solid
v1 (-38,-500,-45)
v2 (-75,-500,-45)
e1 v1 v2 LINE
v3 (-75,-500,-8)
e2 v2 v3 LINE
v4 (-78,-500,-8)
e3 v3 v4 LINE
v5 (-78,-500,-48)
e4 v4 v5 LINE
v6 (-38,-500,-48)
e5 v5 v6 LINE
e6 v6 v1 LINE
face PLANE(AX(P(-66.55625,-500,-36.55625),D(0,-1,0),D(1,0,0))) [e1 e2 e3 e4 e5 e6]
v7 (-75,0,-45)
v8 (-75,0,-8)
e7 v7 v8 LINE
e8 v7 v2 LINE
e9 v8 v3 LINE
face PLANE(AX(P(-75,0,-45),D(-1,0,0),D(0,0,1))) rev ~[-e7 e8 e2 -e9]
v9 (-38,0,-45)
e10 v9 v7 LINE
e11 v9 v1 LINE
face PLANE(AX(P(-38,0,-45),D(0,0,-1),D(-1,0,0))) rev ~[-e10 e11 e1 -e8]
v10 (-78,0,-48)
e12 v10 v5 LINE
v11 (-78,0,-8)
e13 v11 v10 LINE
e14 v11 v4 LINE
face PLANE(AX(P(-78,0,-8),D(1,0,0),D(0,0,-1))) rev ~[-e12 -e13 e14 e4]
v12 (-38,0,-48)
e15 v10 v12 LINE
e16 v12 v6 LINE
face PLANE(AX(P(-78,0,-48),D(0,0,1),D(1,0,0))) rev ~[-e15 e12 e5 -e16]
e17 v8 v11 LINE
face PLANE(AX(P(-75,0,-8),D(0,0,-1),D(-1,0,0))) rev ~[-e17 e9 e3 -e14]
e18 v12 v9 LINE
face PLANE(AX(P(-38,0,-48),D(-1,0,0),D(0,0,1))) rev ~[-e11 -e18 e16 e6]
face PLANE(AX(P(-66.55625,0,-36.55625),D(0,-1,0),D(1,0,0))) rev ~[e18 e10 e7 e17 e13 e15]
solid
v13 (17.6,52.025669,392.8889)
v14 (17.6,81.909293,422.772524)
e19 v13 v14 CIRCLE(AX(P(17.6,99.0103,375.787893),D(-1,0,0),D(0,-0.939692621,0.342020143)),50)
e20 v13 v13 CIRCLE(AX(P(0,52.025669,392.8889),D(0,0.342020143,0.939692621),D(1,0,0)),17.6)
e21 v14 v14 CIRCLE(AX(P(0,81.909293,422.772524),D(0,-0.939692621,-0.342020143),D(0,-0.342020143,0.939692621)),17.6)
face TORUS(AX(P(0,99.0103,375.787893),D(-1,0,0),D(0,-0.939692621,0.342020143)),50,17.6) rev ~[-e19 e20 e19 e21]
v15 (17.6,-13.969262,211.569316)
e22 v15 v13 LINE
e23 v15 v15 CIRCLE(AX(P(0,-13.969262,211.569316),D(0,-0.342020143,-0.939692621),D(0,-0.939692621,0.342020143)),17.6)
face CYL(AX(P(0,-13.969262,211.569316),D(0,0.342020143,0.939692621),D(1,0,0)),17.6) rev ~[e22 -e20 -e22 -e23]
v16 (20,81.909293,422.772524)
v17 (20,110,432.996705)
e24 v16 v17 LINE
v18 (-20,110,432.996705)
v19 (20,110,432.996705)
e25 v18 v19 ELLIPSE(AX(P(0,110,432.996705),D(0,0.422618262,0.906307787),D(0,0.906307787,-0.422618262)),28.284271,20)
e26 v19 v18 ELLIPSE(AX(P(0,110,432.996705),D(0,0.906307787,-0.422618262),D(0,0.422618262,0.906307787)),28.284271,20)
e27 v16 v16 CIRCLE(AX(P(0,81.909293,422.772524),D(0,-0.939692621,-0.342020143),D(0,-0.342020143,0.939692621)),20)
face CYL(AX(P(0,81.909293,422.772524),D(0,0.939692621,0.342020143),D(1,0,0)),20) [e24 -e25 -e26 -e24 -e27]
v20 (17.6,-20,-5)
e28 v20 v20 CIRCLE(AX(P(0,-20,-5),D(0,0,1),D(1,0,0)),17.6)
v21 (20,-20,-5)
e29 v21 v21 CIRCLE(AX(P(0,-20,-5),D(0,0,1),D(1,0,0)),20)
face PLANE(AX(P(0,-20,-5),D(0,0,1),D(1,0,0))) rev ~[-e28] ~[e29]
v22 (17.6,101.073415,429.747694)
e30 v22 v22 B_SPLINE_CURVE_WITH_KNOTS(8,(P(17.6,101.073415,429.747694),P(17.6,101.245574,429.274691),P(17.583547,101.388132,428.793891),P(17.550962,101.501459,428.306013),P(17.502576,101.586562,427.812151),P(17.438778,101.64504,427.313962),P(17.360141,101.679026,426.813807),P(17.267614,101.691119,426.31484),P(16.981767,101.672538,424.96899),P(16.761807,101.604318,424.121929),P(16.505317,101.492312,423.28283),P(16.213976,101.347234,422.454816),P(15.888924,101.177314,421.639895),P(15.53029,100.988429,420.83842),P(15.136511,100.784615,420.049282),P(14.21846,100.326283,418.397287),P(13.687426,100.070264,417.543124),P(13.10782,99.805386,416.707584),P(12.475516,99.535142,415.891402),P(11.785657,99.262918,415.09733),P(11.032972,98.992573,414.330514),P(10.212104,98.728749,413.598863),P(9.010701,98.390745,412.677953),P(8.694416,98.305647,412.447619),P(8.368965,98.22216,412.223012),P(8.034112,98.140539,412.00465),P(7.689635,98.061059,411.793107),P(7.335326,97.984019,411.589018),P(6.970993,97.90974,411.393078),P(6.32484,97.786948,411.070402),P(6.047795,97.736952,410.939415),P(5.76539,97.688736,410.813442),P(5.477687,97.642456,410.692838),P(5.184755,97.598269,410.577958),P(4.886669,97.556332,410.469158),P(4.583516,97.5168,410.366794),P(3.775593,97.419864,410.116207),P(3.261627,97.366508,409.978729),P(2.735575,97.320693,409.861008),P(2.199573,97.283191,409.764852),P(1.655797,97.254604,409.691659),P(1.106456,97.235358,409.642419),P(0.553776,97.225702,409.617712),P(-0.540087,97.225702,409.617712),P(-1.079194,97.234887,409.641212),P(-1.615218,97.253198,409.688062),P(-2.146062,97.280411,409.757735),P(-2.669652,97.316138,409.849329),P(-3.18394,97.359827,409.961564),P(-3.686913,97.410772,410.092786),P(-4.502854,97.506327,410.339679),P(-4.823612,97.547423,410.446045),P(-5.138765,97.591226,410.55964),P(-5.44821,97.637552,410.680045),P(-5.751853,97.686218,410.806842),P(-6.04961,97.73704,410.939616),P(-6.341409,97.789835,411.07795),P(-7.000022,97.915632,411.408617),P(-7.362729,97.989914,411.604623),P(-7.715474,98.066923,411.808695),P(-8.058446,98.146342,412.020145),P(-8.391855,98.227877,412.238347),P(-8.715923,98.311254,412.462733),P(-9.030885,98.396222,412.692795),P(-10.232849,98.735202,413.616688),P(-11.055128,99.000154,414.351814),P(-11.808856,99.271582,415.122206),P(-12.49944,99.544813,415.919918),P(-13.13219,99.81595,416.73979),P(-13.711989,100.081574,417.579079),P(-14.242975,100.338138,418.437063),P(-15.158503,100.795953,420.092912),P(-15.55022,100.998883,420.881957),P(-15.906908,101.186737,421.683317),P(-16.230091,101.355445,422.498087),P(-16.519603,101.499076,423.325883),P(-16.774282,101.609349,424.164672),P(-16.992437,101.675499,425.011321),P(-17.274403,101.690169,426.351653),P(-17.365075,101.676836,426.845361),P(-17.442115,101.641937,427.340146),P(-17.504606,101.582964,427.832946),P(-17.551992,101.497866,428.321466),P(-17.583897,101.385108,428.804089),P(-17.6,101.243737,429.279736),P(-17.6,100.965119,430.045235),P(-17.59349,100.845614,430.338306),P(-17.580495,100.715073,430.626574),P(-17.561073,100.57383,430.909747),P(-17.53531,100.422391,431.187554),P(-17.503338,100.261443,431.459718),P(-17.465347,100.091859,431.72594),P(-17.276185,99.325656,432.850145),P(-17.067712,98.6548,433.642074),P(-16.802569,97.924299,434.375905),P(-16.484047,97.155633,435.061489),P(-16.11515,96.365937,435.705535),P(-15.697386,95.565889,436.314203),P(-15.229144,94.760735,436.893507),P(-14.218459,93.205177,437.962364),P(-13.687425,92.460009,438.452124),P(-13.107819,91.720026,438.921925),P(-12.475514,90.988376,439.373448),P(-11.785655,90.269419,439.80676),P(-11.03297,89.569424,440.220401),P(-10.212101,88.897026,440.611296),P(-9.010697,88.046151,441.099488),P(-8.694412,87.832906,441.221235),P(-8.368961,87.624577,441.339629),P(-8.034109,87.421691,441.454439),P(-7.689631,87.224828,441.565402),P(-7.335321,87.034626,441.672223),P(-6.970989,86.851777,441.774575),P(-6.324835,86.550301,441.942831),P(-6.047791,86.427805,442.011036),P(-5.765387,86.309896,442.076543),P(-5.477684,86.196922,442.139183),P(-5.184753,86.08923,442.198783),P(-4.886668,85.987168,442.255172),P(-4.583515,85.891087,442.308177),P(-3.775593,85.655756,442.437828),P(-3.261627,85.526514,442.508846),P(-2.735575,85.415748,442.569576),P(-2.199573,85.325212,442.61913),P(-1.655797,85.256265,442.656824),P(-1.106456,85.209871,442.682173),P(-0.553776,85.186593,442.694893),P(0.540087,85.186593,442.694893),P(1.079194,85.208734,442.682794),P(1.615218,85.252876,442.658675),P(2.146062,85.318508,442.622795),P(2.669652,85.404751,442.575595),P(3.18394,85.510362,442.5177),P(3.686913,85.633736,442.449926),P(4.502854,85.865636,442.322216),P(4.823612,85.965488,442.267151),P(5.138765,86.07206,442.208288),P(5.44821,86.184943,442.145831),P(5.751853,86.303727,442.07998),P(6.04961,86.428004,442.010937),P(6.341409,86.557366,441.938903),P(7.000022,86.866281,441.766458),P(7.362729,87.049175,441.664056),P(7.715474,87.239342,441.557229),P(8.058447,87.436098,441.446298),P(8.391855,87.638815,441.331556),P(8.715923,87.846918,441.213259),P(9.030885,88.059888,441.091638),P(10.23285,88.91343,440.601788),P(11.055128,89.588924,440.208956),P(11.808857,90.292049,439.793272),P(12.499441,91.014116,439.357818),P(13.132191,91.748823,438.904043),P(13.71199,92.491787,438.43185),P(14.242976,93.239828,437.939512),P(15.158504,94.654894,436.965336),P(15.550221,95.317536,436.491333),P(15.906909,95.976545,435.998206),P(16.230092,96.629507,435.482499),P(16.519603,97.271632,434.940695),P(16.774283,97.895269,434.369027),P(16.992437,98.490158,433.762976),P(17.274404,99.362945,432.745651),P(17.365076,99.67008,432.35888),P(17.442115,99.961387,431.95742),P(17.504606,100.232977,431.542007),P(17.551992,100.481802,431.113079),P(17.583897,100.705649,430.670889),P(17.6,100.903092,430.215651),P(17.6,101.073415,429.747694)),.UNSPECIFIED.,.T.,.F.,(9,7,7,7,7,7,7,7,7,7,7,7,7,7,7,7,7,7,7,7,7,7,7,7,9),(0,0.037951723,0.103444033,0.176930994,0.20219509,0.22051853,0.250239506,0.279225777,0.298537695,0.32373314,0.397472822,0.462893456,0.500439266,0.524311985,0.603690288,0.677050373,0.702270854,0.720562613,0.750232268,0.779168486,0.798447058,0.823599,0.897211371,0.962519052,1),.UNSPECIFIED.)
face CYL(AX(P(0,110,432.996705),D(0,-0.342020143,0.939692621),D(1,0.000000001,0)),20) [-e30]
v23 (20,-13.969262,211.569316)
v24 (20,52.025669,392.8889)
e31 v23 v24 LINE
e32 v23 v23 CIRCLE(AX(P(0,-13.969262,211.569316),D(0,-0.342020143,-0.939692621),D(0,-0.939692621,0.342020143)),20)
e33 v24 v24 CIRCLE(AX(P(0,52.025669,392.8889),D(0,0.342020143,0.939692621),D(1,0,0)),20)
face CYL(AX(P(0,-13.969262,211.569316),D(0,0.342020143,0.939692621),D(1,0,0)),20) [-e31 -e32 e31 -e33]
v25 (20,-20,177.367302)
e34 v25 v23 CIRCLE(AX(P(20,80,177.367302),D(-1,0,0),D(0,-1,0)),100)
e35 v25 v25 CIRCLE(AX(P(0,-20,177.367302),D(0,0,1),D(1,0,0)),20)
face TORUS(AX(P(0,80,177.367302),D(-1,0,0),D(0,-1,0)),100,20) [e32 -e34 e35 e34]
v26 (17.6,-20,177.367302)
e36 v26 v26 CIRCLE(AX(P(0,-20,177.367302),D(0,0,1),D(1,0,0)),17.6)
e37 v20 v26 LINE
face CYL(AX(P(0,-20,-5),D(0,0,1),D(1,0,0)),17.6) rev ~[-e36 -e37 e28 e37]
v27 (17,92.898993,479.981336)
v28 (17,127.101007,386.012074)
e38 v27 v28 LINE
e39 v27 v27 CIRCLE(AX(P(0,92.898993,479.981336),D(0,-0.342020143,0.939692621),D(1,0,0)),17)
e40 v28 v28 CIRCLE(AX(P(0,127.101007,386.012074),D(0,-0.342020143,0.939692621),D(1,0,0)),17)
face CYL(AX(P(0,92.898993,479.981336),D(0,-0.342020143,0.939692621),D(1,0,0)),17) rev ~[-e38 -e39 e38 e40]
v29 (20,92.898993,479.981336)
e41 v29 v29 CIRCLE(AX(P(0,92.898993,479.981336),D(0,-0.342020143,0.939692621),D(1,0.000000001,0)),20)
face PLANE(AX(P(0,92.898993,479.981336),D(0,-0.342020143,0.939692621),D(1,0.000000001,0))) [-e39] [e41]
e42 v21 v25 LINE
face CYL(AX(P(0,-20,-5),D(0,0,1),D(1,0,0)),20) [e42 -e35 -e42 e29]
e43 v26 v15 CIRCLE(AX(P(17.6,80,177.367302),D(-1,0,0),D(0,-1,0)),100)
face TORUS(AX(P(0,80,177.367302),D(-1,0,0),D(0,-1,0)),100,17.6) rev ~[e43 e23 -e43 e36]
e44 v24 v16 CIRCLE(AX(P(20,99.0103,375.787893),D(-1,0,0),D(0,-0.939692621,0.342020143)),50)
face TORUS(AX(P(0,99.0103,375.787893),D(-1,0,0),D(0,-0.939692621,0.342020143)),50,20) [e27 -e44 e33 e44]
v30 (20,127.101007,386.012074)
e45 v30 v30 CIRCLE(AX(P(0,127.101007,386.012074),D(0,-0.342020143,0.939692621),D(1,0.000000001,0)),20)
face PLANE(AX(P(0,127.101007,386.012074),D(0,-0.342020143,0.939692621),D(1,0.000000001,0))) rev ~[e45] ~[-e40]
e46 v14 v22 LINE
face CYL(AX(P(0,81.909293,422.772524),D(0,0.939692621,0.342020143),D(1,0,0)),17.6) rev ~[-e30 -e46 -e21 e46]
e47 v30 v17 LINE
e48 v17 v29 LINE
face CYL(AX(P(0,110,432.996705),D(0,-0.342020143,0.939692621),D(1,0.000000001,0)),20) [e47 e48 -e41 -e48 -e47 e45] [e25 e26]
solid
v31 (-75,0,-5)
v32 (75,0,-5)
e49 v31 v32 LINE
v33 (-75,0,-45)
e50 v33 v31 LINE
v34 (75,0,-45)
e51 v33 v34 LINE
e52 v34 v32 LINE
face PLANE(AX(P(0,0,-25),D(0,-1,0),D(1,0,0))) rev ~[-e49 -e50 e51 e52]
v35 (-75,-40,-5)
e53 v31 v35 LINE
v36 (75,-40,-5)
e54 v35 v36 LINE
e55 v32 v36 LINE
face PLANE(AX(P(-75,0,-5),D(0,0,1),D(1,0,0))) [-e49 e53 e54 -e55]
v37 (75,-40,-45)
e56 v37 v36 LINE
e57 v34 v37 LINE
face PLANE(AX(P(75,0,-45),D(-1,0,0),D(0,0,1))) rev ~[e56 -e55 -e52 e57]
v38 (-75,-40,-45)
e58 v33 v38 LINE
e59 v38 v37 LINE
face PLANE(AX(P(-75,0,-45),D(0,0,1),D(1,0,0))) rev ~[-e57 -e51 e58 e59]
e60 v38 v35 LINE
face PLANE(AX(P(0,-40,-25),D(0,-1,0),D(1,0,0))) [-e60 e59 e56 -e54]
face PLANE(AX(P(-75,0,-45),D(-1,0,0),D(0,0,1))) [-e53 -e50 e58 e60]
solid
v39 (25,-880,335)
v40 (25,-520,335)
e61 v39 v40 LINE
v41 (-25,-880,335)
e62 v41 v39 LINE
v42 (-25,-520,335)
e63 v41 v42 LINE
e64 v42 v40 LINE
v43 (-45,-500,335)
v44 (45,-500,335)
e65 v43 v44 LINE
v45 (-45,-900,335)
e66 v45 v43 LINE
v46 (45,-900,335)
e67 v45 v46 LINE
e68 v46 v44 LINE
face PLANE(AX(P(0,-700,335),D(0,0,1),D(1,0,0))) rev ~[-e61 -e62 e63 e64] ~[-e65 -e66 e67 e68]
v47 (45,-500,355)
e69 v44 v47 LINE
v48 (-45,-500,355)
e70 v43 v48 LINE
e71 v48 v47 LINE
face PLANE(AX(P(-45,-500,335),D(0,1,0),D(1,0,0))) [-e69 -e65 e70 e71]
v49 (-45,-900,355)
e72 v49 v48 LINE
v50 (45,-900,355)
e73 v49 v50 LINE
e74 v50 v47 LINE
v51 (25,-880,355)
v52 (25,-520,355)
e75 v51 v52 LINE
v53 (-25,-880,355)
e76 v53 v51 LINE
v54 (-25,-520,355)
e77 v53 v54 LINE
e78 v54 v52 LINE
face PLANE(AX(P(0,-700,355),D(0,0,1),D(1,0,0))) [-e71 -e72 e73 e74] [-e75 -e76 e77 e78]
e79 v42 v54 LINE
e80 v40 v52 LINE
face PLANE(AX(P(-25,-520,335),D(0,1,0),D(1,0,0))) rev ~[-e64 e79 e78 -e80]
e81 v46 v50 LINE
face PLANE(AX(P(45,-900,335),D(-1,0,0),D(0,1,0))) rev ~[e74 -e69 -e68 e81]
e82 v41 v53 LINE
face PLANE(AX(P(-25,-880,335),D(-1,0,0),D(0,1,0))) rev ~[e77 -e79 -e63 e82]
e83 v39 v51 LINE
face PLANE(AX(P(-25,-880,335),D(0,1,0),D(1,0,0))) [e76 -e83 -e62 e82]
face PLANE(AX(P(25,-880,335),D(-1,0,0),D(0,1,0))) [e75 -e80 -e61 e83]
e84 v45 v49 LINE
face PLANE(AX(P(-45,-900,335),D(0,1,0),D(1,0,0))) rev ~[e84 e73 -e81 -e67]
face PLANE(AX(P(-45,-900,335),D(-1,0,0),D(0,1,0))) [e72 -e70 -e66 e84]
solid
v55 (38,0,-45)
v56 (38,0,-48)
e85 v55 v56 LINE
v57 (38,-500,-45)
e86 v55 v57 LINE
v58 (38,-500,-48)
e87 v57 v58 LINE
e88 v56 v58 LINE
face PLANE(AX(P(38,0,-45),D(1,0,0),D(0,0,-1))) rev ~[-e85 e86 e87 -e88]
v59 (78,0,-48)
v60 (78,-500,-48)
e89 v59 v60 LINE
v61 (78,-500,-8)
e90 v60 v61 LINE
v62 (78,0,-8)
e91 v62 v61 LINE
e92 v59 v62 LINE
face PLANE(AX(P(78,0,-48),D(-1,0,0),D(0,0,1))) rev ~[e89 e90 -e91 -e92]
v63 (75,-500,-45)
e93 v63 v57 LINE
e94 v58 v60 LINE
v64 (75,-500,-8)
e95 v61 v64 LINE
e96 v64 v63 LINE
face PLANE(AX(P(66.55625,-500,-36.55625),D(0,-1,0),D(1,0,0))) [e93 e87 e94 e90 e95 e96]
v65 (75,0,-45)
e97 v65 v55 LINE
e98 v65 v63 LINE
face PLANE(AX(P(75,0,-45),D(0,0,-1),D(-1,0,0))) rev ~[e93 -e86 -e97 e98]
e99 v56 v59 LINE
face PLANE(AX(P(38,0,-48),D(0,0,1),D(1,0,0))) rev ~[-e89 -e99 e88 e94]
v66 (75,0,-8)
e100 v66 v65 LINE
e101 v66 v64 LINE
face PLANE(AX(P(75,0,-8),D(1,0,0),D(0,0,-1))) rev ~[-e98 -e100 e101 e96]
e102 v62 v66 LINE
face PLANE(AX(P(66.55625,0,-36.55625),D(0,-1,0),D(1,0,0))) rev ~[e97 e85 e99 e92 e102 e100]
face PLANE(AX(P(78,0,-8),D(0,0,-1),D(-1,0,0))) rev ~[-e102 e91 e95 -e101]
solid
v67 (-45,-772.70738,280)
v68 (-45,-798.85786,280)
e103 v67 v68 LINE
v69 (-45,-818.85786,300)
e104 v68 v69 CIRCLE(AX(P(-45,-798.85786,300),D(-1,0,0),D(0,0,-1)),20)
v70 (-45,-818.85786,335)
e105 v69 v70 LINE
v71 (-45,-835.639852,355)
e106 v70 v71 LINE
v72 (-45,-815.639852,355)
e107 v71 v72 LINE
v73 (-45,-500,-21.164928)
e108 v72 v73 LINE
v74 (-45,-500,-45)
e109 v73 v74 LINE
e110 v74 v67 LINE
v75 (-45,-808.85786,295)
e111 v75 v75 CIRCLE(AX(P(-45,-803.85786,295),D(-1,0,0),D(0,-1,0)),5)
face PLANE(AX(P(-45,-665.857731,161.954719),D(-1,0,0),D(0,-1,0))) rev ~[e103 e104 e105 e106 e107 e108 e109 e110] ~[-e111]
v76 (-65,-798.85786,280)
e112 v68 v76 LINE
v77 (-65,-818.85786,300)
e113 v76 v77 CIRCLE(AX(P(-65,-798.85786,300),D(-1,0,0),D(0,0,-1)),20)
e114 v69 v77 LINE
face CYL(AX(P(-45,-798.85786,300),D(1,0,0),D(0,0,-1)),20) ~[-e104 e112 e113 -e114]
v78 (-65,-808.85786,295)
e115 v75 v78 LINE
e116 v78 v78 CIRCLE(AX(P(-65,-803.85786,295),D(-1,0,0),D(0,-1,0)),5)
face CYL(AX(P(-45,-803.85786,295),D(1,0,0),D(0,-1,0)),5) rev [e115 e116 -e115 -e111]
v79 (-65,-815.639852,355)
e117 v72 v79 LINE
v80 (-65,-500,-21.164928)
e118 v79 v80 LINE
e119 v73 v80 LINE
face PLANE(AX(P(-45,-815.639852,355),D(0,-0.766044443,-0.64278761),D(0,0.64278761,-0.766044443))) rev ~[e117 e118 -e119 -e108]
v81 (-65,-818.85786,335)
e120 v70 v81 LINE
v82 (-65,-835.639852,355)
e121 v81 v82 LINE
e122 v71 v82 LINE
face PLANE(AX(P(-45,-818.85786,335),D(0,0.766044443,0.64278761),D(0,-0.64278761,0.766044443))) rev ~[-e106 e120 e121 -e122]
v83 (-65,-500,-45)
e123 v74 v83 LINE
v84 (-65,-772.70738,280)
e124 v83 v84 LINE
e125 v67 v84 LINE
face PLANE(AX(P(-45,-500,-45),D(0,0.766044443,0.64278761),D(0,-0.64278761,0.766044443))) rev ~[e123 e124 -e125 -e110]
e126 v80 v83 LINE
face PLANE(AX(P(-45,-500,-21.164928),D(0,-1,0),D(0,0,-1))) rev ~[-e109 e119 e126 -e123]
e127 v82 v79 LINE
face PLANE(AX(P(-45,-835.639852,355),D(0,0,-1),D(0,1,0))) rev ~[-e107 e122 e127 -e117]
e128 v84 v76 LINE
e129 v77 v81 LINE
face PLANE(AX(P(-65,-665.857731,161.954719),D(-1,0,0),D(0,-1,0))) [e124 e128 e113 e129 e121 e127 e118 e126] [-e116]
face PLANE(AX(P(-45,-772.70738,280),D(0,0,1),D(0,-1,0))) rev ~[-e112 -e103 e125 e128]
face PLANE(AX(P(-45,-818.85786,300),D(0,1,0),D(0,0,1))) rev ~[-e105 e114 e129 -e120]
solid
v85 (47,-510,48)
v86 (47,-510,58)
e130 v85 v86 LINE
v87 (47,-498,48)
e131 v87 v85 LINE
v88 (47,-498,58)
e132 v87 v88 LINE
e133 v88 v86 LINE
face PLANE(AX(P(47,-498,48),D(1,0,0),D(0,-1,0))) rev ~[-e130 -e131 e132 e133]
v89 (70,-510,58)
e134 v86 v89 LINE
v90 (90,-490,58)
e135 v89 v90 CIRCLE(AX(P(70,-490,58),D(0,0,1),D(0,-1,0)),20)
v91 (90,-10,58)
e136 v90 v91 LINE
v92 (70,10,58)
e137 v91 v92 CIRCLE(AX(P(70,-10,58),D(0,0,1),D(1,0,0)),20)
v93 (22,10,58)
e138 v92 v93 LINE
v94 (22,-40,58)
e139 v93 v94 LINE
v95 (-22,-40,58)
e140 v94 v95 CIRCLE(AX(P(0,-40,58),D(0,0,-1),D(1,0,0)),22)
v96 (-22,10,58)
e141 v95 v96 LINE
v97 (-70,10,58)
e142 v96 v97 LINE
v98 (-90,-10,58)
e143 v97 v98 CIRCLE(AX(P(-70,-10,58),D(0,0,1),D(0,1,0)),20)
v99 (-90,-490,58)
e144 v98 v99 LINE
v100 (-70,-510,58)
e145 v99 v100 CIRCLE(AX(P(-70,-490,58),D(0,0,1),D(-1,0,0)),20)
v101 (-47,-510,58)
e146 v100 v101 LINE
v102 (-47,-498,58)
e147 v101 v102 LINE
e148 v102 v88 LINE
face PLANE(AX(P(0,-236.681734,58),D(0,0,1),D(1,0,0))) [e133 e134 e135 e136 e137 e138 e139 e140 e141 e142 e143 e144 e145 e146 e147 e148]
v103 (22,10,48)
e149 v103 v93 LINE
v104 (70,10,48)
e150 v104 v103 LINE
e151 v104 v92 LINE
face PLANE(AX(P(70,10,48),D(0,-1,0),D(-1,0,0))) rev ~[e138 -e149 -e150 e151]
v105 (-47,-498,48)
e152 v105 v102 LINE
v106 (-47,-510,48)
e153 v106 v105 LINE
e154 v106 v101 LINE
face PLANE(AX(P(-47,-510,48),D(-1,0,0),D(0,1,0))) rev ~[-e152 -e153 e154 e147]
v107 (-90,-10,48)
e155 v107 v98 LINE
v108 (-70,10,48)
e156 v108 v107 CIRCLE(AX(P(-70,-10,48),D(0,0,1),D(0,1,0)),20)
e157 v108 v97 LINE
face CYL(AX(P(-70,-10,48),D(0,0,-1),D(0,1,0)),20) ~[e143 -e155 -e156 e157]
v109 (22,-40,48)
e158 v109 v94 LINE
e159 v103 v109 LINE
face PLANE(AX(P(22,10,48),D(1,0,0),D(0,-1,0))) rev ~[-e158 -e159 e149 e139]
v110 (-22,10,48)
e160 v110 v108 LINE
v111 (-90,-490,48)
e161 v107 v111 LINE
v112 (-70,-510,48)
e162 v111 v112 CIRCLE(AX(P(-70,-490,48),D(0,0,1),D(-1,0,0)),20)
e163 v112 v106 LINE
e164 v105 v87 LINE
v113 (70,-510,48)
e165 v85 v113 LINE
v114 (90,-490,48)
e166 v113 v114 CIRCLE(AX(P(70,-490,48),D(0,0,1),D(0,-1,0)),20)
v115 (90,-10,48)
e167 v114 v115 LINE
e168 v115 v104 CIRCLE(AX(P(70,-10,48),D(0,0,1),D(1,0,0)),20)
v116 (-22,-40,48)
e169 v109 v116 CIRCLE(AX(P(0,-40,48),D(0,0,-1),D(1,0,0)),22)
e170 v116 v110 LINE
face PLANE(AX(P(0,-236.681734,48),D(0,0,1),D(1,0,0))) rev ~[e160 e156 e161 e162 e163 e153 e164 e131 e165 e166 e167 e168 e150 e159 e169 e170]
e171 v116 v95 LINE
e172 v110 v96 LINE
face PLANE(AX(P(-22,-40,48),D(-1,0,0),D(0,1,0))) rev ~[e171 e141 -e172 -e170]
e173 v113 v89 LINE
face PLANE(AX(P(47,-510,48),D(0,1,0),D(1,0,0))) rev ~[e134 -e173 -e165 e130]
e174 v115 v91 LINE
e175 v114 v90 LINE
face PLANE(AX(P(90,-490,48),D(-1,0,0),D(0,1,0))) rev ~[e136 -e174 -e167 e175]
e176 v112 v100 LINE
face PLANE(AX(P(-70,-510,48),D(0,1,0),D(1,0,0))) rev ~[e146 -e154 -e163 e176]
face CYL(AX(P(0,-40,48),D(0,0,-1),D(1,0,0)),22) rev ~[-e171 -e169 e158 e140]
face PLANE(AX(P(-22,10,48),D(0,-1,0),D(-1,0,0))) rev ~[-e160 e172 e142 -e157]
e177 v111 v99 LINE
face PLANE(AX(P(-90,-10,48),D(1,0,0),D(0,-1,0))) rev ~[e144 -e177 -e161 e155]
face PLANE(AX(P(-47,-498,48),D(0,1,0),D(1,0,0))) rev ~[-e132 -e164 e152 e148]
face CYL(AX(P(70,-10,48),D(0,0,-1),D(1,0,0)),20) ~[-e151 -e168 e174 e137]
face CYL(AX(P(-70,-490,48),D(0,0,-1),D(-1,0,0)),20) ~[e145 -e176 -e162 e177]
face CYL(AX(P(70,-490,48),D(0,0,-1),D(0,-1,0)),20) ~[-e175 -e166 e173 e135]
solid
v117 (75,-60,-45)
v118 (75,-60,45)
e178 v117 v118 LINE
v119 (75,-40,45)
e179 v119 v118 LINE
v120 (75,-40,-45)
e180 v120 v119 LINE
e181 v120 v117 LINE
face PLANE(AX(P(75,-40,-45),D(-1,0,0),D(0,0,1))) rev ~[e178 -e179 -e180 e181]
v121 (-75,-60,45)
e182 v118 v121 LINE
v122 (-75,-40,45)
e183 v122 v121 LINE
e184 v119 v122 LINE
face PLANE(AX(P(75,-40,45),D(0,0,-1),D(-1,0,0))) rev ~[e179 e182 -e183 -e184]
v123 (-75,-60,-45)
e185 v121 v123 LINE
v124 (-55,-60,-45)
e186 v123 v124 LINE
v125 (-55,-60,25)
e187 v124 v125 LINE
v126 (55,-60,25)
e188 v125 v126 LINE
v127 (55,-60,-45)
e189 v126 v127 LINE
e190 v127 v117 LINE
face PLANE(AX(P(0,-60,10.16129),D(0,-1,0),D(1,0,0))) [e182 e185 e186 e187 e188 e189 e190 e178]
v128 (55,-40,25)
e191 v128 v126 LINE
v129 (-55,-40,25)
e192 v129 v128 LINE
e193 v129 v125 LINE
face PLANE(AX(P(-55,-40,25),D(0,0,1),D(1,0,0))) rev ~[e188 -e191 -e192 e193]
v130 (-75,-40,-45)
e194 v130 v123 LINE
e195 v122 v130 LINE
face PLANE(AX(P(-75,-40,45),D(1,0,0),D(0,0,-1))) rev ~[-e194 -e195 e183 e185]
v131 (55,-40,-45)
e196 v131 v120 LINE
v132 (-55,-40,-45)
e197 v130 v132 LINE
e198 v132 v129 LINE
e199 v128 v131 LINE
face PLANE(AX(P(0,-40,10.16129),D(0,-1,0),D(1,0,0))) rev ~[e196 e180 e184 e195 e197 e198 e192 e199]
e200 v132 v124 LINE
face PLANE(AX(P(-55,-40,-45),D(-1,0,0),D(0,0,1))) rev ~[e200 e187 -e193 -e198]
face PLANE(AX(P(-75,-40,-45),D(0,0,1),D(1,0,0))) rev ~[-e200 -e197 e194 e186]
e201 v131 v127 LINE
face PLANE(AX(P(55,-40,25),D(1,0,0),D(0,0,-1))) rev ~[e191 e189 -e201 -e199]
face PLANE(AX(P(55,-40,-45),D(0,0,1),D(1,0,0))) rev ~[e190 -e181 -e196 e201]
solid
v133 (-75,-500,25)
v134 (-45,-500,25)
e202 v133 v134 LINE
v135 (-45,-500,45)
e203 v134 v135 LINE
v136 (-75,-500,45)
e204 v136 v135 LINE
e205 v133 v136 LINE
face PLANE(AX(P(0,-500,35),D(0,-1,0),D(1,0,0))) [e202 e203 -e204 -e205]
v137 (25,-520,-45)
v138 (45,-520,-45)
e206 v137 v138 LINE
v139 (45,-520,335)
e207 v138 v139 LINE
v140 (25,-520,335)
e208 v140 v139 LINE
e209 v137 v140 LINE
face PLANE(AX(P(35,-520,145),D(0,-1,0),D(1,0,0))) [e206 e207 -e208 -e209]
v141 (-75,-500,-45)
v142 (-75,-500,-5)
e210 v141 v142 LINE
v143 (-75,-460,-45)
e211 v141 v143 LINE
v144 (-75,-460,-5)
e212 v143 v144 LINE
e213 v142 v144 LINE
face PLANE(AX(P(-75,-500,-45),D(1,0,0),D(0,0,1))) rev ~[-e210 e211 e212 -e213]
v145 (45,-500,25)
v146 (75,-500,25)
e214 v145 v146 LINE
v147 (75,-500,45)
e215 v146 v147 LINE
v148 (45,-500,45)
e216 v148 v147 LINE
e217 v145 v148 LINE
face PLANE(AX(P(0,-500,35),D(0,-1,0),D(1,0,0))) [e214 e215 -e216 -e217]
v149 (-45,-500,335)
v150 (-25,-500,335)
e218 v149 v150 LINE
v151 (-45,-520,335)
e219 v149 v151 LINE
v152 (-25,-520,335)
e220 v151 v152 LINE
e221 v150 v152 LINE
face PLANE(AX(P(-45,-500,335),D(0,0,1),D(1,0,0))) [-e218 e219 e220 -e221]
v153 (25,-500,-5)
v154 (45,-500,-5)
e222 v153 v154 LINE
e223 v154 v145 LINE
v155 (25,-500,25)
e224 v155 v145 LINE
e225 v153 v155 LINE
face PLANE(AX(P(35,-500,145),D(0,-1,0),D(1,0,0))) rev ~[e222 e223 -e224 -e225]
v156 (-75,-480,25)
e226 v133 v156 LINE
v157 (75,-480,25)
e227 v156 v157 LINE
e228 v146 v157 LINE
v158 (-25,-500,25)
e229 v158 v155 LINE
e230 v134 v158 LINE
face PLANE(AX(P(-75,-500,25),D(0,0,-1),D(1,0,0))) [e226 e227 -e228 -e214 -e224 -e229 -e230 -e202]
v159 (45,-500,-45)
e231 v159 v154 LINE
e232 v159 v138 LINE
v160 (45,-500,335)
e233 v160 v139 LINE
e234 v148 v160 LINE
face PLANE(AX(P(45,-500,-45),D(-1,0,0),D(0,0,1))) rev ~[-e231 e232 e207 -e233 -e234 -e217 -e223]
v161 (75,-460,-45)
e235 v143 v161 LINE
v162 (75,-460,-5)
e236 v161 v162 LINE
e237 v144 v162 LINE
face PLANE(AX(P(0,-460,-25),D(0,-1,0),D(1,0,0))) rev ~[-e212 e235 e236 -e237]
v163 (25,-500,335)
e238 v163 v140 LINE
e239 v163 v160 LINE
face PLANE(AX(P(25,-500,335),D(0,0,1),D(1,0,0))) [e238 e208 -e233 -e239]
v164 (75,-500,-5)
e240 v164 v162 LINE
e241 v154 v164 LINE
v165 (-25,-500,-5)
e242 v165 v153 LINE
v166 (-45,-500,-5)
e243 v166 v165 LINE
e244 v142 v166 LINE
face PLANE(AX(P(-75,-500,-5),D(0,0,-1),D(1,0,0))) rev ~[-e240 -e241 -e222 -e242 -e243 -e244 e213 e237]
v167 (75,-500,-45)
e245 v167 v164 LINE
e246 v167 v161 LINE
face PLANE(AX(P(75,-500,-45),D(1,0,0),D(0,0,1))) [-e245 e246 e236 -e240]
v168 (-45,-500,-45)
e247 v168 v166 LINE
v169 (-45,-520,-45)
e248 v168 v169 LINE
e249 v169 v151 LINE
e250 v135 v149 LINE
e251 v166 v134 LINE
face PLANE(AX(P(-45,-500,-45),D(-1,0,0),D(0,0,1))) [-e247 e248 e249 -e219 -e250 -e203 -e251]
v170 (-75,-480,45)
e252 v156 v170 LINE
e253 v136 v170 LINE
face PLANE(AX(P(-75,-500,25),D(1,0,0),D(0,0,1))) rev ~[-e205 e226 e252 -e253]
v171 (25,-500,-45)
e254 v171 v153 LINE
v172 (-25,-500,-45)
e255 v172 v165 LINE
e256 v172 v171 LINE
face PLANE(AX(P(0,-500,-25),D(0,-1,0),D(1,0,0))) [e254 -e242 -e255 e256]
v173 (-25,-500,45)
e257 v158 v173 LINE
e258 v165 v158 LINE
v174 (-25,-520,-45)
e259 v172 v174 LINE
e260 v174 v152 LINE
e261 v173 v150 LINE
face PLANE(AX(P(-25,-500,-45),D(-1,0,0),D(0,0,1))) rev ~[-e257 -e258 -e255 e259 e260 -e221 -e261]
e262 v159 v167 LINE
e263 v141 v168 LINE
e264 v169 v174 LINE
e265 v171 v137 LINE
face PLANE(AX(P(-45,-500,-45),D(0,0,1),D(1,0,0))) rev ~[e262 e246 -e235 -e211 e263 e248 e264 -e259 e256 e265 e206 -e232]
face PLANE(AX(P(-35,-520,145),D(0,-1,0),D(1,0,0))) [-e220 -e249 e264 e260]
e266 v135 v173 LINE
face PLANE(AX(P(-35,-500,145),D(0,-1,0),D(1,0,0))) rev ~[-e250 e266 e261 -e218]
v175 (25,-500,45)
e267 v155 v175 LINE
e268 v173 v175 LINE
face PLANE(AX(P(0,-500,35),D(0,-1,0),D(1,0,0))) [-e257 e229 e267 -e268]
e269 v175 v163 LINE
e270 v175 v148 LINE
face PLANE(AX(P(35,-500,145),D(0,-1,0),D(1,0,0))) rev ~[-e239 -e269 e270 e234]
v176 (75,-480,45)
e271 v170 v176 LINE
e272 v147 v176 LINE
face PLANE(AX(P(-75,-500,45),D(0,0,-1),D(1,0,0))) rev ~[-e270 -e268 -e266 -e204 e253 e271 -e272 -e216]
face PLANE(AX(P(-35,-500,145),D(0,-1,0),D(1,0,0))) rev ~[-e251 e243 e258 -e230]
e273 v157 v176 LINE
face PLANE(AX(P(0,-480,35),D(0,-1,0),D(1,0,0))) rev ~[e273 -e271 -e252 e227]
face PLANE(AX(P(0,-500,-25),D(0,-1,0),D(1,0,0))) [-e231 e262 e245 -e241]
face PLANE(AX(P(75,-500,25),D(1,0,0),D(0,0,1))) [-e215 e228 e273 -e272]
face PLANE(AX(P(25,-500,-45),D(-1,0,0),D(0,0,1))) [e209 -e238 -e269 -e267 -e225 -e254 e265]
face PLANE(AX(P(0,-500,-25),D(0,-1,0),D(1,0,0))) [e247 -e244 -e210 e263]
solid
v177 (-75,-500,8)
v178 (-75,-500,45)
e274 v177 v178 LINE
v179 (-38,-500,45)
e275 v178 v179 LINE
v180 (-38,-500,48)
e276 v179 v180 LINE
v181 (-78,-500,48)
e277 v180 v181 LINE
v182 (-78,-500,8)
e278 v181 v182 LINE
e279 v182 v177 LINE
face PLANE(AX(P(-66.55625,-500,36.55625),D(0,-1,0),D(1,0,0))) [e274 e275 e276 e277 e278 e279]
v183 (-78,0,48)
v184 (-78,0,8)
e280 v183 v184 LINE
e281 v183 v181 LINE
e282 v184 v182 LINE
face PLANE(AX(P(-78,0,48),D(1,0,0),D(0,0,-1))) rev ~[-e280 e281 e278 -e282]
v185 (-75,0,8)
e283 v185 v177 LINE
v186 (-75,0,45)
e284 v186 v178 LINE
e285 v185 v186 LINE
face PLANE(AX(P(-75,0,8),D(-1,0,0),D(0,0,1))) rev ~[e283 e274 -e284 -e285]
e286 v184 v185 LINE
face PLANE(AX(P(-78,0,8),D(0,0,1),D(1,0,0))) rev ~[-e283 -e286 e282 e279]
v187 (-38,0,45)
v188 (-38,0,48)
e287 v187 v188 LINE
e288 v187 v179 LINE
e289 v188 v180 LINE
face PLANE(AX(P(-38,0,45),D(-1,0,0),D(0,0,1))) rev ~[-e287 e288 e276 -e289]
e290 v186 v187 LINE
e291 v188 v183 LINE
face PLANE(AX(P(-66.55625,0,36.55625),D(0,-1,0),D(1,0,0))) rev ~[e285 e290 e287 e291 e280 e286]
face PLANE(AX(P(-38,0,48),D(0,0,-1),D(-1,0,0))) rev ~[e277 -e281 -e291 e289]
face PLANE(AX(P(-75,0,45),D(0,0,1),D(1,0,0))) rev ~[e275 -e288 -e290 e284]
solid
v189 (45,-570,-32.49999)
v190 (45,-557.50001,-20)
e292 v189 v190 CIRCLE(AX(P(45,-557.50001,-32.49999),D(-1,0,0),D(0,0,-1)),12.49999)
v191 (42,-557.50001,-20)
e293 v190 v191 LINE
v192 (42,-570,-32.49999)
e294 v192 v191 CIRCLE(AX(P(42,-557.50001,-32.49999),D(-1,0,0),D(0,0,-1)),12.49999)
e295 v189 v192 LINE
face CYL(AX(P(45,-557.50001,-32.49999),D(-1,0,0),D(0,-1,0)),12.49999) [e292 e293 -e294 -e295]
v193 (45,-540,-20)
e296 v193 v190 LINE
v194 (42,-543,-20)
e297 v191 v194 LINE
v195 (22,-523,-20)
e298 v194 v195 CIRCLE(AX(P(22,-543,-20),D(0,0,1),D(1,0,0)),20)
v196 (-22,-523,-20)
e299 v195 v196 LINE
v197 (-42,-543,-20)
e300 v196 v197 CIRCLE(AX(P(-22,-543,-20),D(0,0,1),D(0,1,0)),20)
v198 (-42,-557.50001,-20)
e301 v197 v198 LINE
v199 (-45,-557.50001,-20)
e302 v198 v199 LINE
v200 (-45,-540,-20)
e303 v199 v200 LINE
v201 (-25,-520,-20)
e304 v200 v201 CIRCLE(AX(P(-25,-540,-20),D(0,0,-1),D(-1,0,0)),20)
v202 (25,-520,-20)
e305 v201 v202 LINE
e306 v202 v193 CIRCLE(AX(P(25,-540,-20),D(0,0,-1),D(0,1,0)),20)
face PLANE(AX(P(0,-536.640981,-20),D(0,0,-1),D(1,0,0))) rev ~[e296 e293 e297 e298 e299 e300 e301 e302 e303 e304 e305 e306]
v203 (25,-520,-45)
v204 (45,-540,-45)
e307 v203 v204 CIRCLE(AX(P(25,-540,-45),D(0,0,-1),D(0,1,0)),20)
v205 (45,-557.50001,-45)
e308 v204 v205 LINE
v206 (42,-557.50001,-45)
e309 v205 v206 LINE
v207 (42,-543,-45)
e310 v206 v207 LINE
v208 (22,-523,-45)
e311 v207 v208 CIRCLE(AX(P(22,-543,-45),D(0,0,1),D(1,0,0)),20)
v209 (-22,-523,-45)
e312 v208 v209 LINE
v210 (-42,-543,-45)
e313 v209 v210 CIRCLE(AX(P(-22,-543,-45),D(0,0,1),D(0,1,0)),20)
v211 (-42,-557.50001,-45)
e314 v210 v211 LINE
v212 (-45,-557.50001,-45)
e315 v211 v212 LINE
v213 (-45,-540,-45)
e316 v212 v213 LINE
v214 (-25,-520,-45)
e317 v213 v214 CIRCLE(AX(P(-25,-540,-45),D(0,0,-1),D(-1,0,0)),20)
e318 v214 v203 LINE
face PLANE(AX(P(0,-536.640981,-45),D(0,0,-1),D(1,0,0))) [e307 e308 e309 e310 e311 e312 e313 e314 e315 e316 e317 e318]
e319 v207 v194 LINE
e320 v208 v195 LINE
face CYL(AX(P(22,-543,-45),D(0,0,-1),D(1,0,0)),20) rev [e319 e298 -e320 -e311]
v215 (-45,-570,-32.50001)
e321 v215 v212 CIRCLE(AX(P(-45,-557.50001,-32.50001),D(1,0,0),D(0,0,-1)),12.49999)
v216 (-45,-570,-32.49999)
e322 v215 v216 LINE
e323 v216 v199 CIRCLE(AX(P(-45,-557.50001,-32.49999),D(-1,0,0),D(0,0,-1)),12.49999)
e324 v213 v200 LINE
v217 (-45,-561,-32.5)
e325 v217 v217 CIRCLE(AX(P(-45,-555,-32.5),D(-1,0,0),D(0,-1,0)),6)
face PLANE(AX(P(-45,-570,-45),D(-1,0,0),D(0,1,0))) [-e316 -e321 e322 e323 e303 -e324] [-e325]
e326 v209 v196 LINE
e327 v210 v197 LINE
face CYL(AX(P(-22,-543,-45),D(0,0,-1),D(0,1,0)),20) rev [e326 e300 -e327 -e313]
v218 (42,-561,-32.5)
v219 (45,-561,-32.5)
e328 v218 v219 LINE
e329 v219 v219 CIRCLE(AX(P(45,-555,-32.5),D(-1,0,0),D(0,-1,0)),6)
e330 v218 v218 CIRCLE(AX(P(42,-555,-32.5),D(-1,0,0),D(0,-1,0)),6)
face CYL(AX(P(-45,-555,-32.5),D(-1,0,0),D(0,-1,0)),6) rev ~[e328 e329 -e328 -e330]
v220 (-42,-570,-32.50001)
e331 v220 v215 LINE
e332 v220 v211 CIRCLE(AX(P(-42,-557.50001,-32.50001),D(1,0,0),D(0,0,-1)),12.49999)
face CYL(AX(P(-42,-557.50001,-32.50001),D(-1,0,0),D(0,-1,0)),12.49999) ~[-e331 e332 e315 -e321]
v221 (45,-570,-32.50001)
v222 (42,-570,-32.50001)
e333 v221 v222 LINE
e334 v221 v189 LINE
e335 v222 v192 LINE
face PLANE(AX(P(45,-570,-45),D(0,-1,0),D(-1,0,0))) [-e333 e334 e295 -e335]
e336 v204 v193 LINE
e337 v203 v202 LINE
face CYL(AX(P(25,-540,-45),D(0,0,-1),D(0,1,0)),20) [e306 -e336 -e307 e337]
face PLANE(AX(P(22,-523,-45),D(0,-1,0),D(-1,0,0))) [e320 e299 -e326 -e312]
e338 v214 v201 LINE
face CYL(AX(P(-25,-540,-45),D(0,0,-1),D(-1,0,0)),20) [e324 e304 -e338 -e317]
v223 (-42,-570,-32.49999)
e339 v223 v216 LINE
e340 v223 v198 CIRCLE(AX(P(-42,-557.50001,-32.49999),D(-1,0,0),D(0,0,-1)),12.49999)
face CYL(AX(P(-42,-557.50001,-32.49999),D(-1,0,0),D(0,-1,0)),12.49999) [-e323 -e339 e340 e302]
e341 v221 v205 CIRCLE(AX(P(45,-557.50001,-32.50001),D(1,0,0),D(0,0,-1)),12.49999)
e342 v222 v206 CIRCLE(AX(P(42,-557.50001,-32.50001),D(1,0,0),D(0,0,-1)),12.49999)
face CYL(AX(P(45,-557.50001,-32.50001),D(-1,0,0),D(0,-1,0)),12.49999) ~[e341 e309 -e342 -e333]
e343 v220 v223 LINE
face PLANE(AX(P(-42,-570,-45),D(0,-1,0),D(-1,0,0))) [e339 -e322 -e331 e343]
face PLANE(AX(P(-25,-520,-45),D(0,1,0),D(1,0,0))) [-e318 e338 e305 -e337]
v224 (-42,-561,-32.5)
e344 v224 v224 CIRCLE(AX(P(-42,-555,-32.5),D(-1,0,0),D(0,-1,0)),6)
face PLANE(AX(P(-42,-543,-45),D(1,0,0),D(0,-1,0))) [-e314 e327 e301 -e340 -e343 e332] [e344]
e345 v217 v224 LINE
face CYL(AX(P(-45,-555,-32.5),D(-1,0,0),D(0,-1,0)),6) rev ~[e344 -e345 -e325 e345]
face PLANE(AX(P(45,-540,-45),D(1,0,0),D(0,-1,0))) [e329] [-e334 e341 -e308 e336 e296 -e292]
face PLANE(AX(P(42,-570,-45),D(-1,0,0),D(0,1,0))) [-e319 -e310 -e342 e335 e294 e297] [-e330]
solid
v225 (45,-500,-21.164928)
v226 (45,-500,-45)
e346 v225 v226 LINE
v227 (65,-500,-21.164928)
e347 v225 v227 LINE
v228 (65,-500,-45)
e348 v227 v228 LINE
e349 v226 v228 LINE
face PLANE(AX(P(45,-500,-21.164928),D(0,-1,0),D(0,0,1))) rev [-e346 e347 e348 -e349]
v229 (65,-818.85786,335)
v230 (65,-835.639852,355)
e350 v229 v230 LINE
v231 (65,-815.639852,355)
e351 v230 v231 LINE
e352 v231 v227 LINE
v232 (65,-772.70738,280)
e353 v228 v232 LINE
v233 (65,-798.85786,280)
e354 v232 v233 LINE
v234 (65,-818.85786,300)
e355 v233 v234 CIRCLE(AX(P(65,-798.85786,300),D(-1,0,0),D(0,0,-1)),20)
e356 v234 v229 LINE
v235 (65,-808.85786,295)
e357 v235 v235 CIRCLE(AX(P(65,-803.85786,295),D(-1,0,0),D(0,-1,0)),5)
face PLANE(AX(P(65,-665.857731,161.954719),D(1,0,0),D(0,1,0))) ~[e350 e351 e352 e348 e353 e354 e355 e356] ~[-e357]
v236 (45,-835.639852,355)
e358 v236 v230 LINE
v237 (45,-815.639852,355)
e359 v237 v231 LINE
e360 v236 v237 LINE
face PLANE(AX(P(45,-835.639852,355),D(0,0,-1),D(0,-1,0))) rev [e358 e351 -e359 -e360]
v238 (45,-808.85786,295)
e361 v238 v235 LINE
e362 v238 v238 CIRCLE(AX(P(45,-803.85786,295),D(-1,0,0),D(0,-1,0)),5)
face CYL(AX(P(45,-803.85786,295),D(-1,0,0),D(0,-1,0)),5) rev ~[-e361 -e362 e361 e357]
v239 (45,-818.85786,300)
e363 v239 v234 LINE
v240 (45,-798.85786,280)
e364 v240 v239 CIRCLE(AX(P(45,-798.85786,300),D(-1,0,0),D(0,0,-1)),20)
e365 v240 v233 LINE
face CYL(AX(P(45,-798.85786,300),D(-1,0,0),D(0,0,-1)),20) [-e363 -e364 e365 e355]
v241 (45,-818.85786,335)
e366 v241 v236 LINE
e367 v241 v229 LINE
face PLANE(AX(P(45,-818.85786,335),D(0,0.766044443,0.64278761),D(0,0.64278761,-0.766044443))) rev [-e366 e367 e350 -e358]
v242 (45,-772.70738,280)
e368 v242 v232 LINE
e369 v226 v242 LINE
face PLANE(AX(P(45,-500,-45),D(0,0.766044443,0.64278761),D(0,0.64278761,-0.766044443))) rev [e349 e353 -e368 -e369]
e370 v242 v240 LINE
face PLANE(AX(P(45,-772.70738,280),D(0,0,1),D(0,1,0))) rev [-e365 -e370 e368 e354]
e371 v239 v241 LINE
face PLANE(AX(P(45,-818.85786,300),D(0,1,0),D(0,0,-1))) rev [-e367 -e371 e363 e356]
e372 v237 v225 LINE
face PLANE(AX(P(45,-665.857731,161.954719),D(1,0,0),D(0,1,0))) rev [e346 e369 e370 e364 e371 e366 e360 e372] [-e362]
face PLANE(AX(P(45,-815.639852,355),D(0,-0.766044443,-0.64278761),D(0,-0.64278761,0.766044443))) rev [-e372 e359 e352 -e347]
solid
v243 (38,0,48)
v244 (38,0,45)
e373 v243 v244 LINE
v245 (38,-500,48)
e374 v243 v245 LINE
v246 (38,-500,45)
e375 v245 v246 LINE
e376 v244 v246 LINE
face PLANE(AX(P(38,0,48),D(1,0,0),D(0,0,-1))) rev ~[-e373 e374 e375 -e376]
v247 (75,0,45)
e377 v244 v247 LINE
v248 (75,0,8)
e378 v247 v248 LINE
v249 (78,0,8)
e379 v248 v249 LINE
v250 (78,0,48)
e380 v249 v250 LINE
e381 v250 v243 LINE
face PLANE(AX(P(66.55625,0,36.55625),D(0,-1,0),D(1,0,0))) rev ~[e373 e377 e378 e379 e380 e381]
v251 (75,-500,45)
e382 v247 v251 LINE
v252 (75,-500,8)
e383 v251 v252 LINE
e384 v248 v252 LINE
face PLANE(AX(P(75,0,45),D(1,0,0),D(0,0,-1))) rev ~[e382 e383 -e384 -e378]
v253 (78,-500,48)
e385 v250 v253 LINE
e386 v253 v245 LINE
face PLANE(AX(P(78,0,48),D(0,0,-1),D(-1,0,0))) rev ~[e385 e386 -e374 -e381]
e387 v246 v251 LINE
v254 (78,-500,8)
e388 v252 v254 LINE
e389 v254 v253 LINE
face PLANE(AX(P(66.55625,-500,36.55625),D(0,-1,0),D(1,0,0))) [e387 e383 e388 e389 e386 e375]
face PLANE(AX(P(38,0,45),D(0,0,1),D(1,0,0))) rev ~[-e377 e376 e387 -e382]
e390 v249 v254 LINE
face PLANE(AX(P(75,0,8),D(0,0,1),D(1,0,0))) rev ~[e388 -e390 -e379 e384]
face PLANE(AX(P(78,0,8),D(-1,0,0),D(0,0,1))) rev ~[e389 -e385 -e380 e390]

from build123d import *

# Parameters (mm, degrees)
F1_DEPTH  = 500
F2_DEPTH  = 500
F3_W      = 150
F3_H      = 40
F4_DEPTH  = 40
F6_DEPTH  = 20
F8_W      = 150
F8_H      = 20
F9_DEPTH  = 20
F8_H_2    = 40
F10_DEPTH = 40
F11_W     = 20
F11_H     = 380
F12_DEPTH = 20
F13_W     = 90
F13_H     = 400
F13_W_2   = 50
F13_H_2   = 360
F14_DEPTH = 20
F15_R     = 5
F16_DEPTH = 20
F21_R     = 20
F21_R_2   = 17.6
F23_W     = 20
F23_H     = 100
F25_R     = 17
F27_DEPTH = 514.2668195831
F29_DEPTH = 10
F31_DEPTH = 25
F32_R     = 12.49999
F33_R     = 6
F34_DEPTH = 135.001


# Not quite as in the source:
# - a fillet or chamfer is up to 0.001 mm smaller than in the source, because OpenCascade refuses the exact size


with BuildPart() as f1:
    # F0 (on Front) → F1 (new body)
    with BuildSketch(Plane.XZ):
        Polygon((-75, 8), (-75, 45), (-38, 45), (-38, 48), (-78, 48), (-78, 8), align=None)
    extrude(amount=F1_DEPTH)


with BuildPart() as f1b:
    # F0 (on Front) → F1, piece 2 (new body)
    with BuildSketch(Plane.XZ):
        Polygon((78, 8), (78, 48), (38, 48), (38, 45), (75, 45), (75, 8), align=None)
    extrude(amount=F1_DEPTH)


with BuildPart() as f2:
    # F0 (on Front) → F2 (new body)
    with BuildSketch(Plane.XZ):
        Polygon((-78, -48), (-38, -48), (-38, -45), (-75, -45), (-75, -8), (-78, -8), align=None)
    extrude(amount=F2_DEPTH)


with BuildPart() as f2b:
    # F0 (on Front) → F2, piece 2 (new body)
    with BuildSketch(Plane.XZ):
        Polygon((38, -45), (38, -48), (78, -48), (78, -8), (75, -8), (75, -45), align=None)
    extrude(amount=F2_DEPTH)


with BuildPart() as f4:
    # F3 (on Front) → F4 (new body)
    with BuildSketch(Plane.XZ):
        with Locations((0, -25)):
            Rectangle(F3_W, F3_H)
    extrude(amount=F4_DEPTH)


with BuildPart() as f6:
    # F5 (on face) → F6 (new body)
    with BuildSketch(Plane.XZ.offset(40)):
        Polygon((75, -45), (75, 45), (-75, 45), (-75, -45), (-55, -45), (-55, 25), (55, 25), (55, -45), align=None)
    extrude(amount=F6_DEPTH)


with BuildPart() as f9:
    # F8 (on offset) → F9 (new body)
    with BuildSketch(Plane.XZ.offset(500)):
        with Locations((0, 35)):
            Rectangle(F8_W, F8_H)
    extrude(amount=-F9_DEPTH)



with BuildPart() as f10:
    # F8 (on offset) → F10 (new body)
    with BuildSketch(Plane.XZ.offset(500)):
        with Locations((0, -25)):
            Rectangle(F8_W, F8_H_2)
    extrude(amount=-F10_DEPTH)


with BuildPart() as f9_1:
    add(f9.part)

    add(f10.part)  # F12 merges F10
    # F11 (on offset) → F12 (join)
    with BuildSketch(Plane.XZ.offset(500)):
        with Locations((-35, 145)):
            Rectangle(F11_W, F11_H)
        with Locations((35, 145)):
            Rectangle(F11_W, F11_H)
    extrude(amount=F12_DEPTH)


with BuildPart() as f14:
    # F13 (on face) → F14 (new body)
    with BuildSketch(Plane.XY.offset(335)):
        with Locations((0, -700)):
            Rectangle(F13_W, F13_H)
        with Locations((0, -700)):
            Rectangle(F13_W_2, F13_H_2, mode=Mode.SUBTRACT)
    extrude(amount=F14_DEPTH)


with BuildPart() as f16:
    # F15 (on face) → F16 (new body)
    with BuildSketch(Plane(origin=(-45, 0, 0), x_dir=(0, -1, 0), z_dir=(-1, 0, 0))):
        with BuildLine():
            Line((815.6398524709, 355), (500, -21.1649281481))
            Line((500, -21.1649281481), (500, -45))
            Line((500, -45), (772.7073801326, 280))
            Line((772.7073801326, 280), (798.8578598474, 280))
            ThreePointArc((798.8578598474, 280), (812.9999954711, 285.8578643763), (818.8578598474, 300))
            Line((818.8578598474, 300), (818.8578598474, 335))
            Line((818.8578598474, 335), (835.6398524709, 355))
            Line((835.6398524709, 355), (815.6398524709, 355))
        make_face()
        with Locations((803.8578598474, 295)):
            Circle(F15_R, mode=Mode.SUBTRACT)
    extrude(amount=F16_DEPTH)


with BuildPart() as f17_1:
    # F17: instance of F16
    add(f16.part.mirror(Plane.YZ))


with BuildPart() as f22:
    # F22: sweep along a path in F18
    with BuildLine(Plane.YZ) as f22_path:
        Line((-20, -5), (-20, 177.3673019292))
        ThreePointArc((-20, 177.3673019292), (-18.4807753012, 194.7321196958), (-13.9692620786, 211.5693162617))
        Line((-13.9692620786, 211.5693162617), (52.0256693962, 392.8889002872))
        ThreePointArc((52.0256693962, 392.8889002872), (63.6549613762, 411.1432321802), (81.9092932692, 422.7725241602))
        Line((81.9092932692, 422.7725241602), (110, 432.9967052697))
    # F21 (on line) → F22 (sweep)
    with BuildSketch(Plane.XY.offset(-5)):
        with Locations((0, -20)):
            Circle(F21_R)
        with Locations((0, -20)):
            Circle(F21_R_2, mode=Mode.SUBTRACT)
    sweep(path=f22_path.line)

    # F23 (on face) → F26 (revolve)
    with BuildSketch(Plane(origin=(0, 236.2949029628, 86.0043111873), x_dir=(-1, 0, 0), z_dir=(0, 0.9396926208, 0.3420201433))):
        with Locations((-10, 369.2615930007)):
            Rectangle(F23_W, F23_H)
    revolve(axis=Axis((0, 110, 432.9967052697), (0, -0.3420201433, 0.9396926208)))

    # F25 (on line) → F27 (cut, through all)
    with BuildSketch(Plane(origin=(0, -143.395910129, 393.9770251217), x_dir=(1, 0, 0), z_dir=(0, -0.3420201433, 0.9396926208))):
        with Locations((0, 251.4597834823)):
            Circle(F25_R)
    extrude(amount=-F27_DEPTH, mode=Mode.SUBTRACT)


with BuildPart() as f29:
    # F28 (on face) → F29 (new body)
    with BuildSketch(Plane.XY.offset(48)):
        with BuildLine():
            Line((-22, 10), (-70, 10))
            ThreePointArc((-70, 10), (-84.1421356237, 4.1421356237), (-90, -10))
            Line((-90, -10), (-90, -490))
            ThreePointArc((-90, -490), (-84.1421356237, -504.1421356237), (-70, -510))
            Line((-70, -510), (-47, -510))
            Line((-47, -510), (-47, -498))
            Line((-47, -498), (47, -498))
            Line((47, -498), (47, -510))
            Line((47, -510), (70, -510))
            ThreePointArc((70, -510), (84.1421356237, -504.1421356237), (90, -490))
            Line((90, -490), (90, -10))
            ThreePointArc((90, -10), (84.1421356237, 4.1421356237), (70, 10))
            Line((70, 10), (22, 10))
            Line((22, 10), (22, -40))
            ThreePointArc((22, -40), (0, -62), (-22, -40))
            Line((-22, -40), (-22, 10))
        make_face()
    extrude(amount=F29_DEPTH)


with BuildPart() as f31:
    # F30 (on face) → F31 (new body)
    with BuildSketch(Plane(origin=(0, 0, -45), x_dir=(1, 0, 0), z_dir=(0, 0, -1))):
        with BuildLine():
            ThreePointArc((-45, 540), (-39.1421356237, 525.8578643763), (-25, 520))
            Line((-25, 520), (25, 520))
            ThreePointArc((25, 520), (39.1421356237, 525.8578643763), (45, 540))
            Line((45, 540), (45, 570))
            Line((45, 570), (42, 570))
            Line((42, 570), (42, 543))
            ThreePointArc((42, 543), (36.1421356237, 528.8578643763), (22, 523))
            Line((22, 523), (-22, 523))
            ThreePointArc((-22, 523), (-36.1421356237, 528.8578643763), (-42, 543))
            Line((-42, 543), (-42, 570))
            Line((-42, 570), (-45, 570))
            Line((-45, 570), (-45, 540))
        make_face()
    extrude(amount=-F31_DEPTH)

    # F32 (radius 12.5 in the source; OpenCascade refuses exactly that, so slightly less here)
    f32_edges = [f31.edges().sort_by_distance(p)[0] for p in [
        (-43.5, -570, -20),
        (43.5, -570, -20),
        (43.5, -570, -45),
        (-43.5, -570, -45),
    ]]
    fillet(f32_edges, radius=F32_R)

    # F33 (on face) → F34 (cut, through all)
    with BuildSketch(Plane(origin=(-45, 0, 0), x_dir=(0, -1, 0), z_dir=(-1, 0, 0))):
        with Locations((555, -32.5)):
            Circle(F33_R)
    extrude(amount=-F34_DEPTH, mode=Mode.SUBTRACT)


solid = Compound([f1.part, f1b.part, f2.part, f2b.part, f4.part, f6.part, f9_1.part, f14.part, f16.part, f17_1.part, f22.part, f29.part, f31.part])
